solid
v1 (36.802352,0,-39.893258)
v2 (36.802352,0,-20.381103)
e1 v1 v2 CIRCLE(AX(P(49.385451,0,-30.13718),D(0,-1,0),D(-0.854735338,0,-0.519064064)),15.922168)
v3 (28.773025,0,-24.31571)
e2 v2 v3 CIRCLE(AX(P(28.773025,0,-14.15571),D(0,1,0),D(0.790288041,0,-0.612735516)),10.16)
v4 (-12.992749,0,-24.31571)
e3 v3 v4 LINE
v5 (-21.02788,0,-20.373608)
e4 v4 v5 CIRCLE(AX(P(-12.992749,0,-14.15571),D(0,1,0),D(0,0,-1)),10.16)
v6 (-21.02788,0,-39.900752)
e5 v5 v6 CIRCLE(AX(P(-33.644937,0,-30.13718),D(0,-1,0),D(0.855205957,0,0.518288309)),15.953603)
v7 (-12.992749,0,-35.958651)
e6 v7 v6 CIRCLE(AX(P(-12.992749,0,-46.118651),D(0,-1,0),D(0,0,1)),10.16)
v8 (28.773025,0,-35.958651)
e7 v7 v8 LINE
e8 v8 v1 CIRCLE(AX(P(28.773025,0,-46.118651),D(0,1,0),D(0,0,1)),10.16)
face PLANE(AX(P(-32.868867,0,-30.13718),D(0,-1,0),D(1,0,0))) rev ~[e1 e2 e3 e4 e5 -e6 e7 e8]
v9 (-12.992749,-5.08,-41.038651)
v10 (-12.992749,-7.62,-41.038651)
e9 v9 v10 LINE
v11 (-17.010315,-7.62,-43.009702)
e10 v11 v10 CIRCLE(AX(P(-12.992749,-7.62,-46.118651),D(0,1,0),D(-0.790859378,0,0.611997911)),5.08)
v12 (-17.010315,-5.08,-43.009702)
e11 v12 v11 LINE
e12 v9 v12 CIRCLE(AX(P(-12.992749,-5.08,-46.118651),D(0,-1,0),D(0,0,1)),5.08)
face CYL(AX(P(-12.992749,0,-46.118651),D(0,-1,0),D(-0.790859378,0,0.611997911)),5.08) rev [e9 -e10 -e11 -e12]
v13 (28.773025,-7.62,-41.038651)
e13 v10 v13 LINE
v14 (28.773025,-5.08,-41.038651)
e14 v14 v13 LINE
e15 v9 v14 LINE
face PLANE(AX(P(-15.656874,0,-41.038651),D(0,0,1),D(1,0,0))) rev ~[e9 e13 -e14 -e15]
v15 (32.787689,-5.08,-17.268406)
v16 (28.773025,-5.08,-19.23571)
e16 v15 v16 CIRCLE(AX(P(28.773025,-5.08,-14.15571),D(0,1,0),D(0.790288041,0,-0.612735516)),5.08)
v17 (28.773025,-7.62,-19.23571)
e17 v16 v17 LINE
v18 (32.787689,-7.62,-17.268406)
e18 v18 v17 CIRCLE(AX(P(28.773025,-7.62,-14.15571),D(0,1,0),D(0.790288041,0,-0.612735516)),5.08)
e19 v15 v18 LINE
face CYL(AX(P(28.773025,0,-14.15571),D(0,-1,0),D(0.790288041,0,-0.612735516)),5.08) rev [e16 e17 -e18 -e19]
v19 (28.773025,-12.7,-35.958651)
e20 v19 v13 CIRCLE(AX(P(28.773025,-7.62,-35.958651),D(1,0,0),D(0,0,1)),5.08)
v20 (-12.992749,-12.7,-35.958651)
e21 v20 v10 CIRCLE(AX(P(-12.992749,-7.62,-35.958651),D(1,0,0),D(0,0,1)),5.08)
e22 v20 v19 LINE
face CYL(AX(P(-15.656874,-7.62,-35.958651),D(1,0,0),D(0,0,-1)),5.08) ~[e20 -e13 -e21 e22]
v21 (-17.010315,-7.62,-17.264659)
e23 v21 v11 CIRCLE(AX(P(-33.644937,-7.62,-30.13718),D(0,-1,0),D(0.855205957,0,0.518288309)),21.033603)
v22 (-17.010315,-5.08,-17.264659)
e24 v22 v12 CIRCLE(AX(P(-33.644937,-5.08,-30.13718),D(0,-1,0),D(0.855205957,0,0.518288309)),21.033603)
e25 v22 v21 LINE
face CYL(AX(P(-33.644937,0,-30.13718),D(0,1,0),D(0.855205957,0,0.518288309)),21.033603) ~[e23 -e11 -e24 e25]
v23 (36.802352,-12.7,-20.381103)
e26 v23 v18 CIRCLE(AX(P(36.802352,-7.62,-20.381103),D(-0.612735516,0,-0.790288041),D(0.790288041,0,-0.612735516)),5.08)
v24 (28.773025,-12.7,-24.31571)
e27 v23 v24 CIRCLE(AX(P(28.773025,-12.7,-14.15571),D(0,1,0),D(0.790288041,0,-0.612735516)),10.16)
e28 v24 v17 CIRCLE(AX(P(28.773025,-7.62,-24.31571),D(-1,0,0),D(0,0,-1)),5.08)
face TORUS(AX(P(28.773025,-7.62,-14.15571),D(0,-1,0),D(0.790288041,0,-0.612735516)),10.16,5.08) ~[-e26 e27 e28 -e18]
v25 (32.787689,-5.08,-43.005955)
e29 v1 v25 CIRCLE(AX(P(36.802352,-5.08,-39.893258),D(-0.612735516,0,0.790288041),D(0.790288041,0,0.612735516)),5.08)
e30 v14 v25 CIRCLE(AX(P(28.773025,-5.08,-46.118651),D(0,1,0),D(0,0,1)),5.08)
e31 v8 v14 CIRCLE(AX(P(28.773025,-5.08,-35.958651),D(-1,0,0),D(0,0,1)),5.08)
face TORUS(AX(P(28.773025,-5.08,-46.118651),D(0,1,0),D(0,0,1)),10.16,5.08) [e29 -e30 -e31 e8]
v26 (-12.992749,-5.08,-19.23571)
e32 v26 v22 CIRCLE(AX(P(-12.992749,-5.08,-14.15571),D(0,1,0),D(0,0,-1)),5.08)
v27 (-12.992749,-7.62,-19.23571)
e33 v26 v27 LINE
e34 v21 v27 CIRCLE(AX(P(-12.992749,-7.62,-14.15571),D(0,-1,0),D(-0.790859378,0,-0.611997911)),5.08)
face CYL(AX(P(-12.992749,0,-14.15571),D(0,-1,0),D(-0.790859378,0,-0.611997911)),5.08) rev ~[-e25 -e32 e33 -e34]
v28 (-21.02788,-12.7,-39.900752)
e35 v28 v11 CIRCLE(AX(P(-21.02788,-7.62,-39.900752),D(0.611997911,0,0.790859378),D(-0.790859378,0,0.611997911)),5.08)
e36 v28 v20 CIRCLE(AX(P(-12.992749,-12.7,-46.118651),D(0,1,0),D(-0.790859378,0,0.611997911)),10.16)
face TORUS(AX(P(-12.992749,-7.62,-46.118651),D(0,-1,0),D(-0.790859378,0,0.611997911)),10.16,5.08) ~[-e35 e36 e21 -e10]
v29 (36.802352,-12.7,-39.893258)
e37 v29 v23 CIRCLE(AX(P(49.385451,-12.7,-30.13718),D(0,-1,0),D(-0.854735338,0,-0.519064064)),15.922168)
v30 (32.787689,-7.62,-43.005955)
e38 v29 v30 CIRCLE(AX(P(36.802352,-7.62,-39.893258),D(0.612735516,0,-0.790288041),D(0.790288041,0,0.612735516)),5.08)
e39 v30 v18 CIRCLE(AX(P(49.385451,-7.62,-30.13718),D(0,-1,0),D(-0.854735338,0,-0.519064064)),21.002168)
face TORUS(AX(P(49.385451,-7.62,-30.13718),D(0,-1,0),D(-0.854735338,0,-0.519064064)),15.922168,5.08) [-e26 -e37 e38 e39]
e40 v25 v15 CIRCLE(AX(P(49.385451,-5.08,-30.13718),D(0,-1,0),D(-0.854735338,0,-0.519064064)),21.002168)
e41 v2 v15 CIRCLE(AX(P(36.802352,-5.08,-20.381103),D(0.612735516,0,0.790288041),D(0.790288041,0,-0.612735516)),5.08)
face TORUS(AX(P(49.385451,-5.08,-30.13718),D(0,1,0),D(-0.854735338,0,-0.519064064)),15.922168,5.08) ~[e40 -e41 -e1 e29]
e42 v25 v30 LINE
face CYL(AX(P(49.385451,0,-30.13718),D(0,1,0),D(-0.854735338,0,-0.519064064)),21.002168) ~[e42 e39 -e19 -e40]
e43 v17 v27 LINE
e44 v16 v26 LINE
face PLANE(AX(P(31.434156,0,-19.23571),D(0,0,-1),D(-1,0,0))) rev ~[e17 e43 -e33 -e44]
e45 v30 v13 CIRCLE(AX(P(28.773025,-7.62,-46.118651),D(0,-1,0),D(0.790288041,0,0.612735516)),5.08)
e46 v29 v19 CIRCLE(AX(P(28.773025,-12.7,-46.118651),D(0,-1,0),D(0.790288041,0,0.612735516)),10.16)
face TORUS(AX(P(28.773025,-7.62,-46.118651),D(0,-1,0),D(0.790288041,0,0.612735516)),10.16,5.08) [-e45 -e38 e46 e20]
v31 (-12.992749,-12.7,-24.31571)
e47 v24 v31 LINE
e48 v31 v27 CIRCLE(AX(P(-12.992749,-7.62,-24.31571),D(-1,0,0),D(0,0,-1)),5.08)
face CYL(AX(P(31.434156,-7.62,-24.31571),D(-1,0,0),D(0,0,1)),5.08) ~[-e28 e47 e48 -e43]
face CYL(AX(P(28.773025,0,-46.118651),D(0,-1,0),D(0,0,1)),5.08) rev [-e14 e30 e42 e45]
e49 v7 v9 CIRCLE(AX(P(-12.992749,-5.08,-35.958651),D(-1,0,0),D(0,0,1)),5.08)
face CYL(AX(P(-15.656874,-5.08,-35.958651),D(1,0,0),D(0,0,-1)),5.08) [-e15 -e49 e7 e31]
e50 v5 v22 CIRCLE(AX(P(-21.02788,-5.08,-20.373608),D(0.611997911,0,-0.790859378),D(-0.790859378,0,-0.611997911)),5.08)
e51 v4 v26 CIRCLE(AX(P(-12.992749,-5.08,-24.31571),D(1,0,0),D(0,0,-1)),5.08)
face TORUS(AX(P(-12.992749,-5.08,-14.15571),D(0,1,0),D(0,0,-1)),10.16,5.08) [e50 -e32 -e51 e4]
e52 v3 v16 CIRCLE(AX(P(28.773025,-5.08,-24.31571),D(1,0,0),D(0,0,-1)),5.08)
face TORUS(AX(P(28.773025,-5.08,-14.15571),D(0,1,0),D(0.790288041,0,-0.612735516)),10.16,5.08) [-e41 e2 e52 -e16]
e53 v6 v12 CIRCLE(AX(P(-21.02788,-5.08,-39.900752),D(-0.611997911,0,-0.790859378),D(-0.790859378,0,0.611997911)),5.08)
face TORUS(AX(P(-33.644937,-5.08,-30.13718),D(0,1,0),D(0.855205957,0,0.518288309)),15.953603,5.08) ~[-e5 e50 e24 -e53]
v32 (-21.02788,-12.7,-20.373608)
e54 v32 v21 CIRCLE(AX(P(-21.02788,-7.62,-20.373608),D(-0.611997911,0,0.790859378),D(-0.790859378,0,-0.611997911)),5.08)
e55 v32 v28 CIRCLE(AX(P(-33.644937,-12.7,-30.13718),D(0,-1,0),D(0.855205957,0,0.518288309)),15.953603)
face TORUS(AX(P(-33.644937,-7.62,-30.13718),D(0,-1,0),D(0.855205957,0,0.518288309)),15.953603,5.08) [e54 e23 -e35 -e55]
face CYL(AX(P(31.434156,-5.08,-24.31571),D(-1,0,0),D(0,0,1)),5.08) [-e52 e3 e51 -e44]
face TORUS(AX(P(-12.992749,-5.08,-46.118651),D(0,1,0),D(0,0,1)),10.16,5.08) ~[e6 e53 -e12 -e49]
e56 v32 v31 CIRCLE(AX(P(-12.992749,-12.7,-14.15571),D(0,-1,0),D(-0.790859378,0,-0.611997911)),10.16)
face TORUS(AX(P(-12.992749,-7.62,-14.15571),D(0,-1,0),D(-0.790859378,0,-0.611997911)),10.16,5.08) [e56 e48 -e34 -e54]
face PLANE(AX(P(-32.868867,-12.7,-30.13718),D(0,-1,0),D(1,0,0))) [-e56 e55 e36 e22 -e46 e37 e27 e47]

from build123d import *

# Parameters (mm, degrees)
F1_DEPTH = 12.7
F2_R     = 5.08


with BuildPart() as f1:
    # F0 (on Front) → F1 (new body)
    with BuildSketch(Plane.XZ):
        with BuildLine():
            Line((-28.5442825407, -19.2357096821), (-15.6568741476, -19.2357096821))
            ThreePointArc((-15.6568741476, -19.2357096821), (-54.678540264, -30.1371803507), (-15.6568741476, -41.0386510193))
            Line((-15.6568741476, -41.0386510193), (-28.5442825407, -41.0386510193))
            Line((-28.5442825407, -41.0386510193), (-28.5442825407, -19.2357096821))
        make_face()
        with BuildLine():
            Line((42.9155228194, -41.0386510193), (42.9155228194, -19.2357096821))
            Line((42.9155228194, -19.2357096821), (31.4341556288, -19.2357096821))
            ThreePointArc((31.4341556288, -19.2357096821), (28.3832827885, -30.1371803507), (31.4341556288, -41.0386510193))
            Line((31.4341556288, -41.0386510193), (42.9155228194, -41.0386510193))
        make_face()
        with BuildLine():
            ThreePointArc((31.4341556288, -41.0386510193), (28.3832827885, -30.1371803507), (31.4341556288, -19.2357096821))
            Line((31.4341556288, -19.2357096821), (-15.6568741476, -19.2357096821))
            ThreePointArc((-15.6568741476, -19.2357096821), (-13.3870219255, -24.4777329529), (-12.6113336936, -30.1371803507))
            ThreePointArc((-12.6113336936, -30.1371803507), (-13.3870219255, -35.7966277486), (-15.6568741476, -41.0386510193))
            Line((-15.6568741476, -41.0386510193), (31.4341556288, -41.0386510193))
        make_face()
        with BuildLine():
            ThreePointArc((-12.6113336936, -30.1371803507), (-13.3870219255, -24.4777329529), (-15.6568741476, -19.2357096821))
            Line((-15.6568741476, -19.2357096821), (-28.5442825407, -19.2357096821))
            Line((-28.5442825407, -19.2357096821), (-28.5442825407, -41.0386510193))
            Line((-28.5442825407, -41.0386510193), (-15.6568741476, -41.0386510193))
            ThreePointArc((-15.6568741476, -41.0386510193), (-13.3870219255, -35.7966277486), (-12.6113336936, -30.1371803507))
        make_face()
        with BuildLine():
            Line((31.4341556288, -19.2357096821), (42.9155228194, -19.2357096821))
            Line((42.9155228194, -19.2357096821), (42.9155228194, -41.0386510193))
            Line((42.9155228194, -41.0386510193), (31.4341556288, -41.0386510193))
            ThreePointArc((31.4341556288, -41.0386510193), (55.0456161452, -50.3622536115), (70.3876187723, -30.1371803507))
            ThreePointArc((70.3876187723, -30.1371803507), (55.0456161452, -9.91210709), (31.4341556288, -19.2357096821))
        make_face()
    extrude(amount=F1_DEPTH)

    # F2
    f2_edges = [f1.edges().sort_by_distance(p)[0] for p in [
        (-54.67854, 0, -30.13718),
        (-15.656874, -6.35, -19.23571),
        (-15.656874, -6.35, -41.038651),
        (-54.67854, -12.7, -30.13718),
        (7.888641, 0, -41.038651),
        (70.387619, 0, -30.13718),
        (7.888641, 0, -19.23571),
        (31.434156, -6.35, -41.038651),
        (31.434156, -6.35, -19.23571),
        (70.387619, -12.7, -30.13718),
        (7.888641, -12.7, -41.038651),
        (7.888641, -12.7, -19.23571),
    ]]
    fillet(f2_edges, radius=F2_R)


solid = f1.part
